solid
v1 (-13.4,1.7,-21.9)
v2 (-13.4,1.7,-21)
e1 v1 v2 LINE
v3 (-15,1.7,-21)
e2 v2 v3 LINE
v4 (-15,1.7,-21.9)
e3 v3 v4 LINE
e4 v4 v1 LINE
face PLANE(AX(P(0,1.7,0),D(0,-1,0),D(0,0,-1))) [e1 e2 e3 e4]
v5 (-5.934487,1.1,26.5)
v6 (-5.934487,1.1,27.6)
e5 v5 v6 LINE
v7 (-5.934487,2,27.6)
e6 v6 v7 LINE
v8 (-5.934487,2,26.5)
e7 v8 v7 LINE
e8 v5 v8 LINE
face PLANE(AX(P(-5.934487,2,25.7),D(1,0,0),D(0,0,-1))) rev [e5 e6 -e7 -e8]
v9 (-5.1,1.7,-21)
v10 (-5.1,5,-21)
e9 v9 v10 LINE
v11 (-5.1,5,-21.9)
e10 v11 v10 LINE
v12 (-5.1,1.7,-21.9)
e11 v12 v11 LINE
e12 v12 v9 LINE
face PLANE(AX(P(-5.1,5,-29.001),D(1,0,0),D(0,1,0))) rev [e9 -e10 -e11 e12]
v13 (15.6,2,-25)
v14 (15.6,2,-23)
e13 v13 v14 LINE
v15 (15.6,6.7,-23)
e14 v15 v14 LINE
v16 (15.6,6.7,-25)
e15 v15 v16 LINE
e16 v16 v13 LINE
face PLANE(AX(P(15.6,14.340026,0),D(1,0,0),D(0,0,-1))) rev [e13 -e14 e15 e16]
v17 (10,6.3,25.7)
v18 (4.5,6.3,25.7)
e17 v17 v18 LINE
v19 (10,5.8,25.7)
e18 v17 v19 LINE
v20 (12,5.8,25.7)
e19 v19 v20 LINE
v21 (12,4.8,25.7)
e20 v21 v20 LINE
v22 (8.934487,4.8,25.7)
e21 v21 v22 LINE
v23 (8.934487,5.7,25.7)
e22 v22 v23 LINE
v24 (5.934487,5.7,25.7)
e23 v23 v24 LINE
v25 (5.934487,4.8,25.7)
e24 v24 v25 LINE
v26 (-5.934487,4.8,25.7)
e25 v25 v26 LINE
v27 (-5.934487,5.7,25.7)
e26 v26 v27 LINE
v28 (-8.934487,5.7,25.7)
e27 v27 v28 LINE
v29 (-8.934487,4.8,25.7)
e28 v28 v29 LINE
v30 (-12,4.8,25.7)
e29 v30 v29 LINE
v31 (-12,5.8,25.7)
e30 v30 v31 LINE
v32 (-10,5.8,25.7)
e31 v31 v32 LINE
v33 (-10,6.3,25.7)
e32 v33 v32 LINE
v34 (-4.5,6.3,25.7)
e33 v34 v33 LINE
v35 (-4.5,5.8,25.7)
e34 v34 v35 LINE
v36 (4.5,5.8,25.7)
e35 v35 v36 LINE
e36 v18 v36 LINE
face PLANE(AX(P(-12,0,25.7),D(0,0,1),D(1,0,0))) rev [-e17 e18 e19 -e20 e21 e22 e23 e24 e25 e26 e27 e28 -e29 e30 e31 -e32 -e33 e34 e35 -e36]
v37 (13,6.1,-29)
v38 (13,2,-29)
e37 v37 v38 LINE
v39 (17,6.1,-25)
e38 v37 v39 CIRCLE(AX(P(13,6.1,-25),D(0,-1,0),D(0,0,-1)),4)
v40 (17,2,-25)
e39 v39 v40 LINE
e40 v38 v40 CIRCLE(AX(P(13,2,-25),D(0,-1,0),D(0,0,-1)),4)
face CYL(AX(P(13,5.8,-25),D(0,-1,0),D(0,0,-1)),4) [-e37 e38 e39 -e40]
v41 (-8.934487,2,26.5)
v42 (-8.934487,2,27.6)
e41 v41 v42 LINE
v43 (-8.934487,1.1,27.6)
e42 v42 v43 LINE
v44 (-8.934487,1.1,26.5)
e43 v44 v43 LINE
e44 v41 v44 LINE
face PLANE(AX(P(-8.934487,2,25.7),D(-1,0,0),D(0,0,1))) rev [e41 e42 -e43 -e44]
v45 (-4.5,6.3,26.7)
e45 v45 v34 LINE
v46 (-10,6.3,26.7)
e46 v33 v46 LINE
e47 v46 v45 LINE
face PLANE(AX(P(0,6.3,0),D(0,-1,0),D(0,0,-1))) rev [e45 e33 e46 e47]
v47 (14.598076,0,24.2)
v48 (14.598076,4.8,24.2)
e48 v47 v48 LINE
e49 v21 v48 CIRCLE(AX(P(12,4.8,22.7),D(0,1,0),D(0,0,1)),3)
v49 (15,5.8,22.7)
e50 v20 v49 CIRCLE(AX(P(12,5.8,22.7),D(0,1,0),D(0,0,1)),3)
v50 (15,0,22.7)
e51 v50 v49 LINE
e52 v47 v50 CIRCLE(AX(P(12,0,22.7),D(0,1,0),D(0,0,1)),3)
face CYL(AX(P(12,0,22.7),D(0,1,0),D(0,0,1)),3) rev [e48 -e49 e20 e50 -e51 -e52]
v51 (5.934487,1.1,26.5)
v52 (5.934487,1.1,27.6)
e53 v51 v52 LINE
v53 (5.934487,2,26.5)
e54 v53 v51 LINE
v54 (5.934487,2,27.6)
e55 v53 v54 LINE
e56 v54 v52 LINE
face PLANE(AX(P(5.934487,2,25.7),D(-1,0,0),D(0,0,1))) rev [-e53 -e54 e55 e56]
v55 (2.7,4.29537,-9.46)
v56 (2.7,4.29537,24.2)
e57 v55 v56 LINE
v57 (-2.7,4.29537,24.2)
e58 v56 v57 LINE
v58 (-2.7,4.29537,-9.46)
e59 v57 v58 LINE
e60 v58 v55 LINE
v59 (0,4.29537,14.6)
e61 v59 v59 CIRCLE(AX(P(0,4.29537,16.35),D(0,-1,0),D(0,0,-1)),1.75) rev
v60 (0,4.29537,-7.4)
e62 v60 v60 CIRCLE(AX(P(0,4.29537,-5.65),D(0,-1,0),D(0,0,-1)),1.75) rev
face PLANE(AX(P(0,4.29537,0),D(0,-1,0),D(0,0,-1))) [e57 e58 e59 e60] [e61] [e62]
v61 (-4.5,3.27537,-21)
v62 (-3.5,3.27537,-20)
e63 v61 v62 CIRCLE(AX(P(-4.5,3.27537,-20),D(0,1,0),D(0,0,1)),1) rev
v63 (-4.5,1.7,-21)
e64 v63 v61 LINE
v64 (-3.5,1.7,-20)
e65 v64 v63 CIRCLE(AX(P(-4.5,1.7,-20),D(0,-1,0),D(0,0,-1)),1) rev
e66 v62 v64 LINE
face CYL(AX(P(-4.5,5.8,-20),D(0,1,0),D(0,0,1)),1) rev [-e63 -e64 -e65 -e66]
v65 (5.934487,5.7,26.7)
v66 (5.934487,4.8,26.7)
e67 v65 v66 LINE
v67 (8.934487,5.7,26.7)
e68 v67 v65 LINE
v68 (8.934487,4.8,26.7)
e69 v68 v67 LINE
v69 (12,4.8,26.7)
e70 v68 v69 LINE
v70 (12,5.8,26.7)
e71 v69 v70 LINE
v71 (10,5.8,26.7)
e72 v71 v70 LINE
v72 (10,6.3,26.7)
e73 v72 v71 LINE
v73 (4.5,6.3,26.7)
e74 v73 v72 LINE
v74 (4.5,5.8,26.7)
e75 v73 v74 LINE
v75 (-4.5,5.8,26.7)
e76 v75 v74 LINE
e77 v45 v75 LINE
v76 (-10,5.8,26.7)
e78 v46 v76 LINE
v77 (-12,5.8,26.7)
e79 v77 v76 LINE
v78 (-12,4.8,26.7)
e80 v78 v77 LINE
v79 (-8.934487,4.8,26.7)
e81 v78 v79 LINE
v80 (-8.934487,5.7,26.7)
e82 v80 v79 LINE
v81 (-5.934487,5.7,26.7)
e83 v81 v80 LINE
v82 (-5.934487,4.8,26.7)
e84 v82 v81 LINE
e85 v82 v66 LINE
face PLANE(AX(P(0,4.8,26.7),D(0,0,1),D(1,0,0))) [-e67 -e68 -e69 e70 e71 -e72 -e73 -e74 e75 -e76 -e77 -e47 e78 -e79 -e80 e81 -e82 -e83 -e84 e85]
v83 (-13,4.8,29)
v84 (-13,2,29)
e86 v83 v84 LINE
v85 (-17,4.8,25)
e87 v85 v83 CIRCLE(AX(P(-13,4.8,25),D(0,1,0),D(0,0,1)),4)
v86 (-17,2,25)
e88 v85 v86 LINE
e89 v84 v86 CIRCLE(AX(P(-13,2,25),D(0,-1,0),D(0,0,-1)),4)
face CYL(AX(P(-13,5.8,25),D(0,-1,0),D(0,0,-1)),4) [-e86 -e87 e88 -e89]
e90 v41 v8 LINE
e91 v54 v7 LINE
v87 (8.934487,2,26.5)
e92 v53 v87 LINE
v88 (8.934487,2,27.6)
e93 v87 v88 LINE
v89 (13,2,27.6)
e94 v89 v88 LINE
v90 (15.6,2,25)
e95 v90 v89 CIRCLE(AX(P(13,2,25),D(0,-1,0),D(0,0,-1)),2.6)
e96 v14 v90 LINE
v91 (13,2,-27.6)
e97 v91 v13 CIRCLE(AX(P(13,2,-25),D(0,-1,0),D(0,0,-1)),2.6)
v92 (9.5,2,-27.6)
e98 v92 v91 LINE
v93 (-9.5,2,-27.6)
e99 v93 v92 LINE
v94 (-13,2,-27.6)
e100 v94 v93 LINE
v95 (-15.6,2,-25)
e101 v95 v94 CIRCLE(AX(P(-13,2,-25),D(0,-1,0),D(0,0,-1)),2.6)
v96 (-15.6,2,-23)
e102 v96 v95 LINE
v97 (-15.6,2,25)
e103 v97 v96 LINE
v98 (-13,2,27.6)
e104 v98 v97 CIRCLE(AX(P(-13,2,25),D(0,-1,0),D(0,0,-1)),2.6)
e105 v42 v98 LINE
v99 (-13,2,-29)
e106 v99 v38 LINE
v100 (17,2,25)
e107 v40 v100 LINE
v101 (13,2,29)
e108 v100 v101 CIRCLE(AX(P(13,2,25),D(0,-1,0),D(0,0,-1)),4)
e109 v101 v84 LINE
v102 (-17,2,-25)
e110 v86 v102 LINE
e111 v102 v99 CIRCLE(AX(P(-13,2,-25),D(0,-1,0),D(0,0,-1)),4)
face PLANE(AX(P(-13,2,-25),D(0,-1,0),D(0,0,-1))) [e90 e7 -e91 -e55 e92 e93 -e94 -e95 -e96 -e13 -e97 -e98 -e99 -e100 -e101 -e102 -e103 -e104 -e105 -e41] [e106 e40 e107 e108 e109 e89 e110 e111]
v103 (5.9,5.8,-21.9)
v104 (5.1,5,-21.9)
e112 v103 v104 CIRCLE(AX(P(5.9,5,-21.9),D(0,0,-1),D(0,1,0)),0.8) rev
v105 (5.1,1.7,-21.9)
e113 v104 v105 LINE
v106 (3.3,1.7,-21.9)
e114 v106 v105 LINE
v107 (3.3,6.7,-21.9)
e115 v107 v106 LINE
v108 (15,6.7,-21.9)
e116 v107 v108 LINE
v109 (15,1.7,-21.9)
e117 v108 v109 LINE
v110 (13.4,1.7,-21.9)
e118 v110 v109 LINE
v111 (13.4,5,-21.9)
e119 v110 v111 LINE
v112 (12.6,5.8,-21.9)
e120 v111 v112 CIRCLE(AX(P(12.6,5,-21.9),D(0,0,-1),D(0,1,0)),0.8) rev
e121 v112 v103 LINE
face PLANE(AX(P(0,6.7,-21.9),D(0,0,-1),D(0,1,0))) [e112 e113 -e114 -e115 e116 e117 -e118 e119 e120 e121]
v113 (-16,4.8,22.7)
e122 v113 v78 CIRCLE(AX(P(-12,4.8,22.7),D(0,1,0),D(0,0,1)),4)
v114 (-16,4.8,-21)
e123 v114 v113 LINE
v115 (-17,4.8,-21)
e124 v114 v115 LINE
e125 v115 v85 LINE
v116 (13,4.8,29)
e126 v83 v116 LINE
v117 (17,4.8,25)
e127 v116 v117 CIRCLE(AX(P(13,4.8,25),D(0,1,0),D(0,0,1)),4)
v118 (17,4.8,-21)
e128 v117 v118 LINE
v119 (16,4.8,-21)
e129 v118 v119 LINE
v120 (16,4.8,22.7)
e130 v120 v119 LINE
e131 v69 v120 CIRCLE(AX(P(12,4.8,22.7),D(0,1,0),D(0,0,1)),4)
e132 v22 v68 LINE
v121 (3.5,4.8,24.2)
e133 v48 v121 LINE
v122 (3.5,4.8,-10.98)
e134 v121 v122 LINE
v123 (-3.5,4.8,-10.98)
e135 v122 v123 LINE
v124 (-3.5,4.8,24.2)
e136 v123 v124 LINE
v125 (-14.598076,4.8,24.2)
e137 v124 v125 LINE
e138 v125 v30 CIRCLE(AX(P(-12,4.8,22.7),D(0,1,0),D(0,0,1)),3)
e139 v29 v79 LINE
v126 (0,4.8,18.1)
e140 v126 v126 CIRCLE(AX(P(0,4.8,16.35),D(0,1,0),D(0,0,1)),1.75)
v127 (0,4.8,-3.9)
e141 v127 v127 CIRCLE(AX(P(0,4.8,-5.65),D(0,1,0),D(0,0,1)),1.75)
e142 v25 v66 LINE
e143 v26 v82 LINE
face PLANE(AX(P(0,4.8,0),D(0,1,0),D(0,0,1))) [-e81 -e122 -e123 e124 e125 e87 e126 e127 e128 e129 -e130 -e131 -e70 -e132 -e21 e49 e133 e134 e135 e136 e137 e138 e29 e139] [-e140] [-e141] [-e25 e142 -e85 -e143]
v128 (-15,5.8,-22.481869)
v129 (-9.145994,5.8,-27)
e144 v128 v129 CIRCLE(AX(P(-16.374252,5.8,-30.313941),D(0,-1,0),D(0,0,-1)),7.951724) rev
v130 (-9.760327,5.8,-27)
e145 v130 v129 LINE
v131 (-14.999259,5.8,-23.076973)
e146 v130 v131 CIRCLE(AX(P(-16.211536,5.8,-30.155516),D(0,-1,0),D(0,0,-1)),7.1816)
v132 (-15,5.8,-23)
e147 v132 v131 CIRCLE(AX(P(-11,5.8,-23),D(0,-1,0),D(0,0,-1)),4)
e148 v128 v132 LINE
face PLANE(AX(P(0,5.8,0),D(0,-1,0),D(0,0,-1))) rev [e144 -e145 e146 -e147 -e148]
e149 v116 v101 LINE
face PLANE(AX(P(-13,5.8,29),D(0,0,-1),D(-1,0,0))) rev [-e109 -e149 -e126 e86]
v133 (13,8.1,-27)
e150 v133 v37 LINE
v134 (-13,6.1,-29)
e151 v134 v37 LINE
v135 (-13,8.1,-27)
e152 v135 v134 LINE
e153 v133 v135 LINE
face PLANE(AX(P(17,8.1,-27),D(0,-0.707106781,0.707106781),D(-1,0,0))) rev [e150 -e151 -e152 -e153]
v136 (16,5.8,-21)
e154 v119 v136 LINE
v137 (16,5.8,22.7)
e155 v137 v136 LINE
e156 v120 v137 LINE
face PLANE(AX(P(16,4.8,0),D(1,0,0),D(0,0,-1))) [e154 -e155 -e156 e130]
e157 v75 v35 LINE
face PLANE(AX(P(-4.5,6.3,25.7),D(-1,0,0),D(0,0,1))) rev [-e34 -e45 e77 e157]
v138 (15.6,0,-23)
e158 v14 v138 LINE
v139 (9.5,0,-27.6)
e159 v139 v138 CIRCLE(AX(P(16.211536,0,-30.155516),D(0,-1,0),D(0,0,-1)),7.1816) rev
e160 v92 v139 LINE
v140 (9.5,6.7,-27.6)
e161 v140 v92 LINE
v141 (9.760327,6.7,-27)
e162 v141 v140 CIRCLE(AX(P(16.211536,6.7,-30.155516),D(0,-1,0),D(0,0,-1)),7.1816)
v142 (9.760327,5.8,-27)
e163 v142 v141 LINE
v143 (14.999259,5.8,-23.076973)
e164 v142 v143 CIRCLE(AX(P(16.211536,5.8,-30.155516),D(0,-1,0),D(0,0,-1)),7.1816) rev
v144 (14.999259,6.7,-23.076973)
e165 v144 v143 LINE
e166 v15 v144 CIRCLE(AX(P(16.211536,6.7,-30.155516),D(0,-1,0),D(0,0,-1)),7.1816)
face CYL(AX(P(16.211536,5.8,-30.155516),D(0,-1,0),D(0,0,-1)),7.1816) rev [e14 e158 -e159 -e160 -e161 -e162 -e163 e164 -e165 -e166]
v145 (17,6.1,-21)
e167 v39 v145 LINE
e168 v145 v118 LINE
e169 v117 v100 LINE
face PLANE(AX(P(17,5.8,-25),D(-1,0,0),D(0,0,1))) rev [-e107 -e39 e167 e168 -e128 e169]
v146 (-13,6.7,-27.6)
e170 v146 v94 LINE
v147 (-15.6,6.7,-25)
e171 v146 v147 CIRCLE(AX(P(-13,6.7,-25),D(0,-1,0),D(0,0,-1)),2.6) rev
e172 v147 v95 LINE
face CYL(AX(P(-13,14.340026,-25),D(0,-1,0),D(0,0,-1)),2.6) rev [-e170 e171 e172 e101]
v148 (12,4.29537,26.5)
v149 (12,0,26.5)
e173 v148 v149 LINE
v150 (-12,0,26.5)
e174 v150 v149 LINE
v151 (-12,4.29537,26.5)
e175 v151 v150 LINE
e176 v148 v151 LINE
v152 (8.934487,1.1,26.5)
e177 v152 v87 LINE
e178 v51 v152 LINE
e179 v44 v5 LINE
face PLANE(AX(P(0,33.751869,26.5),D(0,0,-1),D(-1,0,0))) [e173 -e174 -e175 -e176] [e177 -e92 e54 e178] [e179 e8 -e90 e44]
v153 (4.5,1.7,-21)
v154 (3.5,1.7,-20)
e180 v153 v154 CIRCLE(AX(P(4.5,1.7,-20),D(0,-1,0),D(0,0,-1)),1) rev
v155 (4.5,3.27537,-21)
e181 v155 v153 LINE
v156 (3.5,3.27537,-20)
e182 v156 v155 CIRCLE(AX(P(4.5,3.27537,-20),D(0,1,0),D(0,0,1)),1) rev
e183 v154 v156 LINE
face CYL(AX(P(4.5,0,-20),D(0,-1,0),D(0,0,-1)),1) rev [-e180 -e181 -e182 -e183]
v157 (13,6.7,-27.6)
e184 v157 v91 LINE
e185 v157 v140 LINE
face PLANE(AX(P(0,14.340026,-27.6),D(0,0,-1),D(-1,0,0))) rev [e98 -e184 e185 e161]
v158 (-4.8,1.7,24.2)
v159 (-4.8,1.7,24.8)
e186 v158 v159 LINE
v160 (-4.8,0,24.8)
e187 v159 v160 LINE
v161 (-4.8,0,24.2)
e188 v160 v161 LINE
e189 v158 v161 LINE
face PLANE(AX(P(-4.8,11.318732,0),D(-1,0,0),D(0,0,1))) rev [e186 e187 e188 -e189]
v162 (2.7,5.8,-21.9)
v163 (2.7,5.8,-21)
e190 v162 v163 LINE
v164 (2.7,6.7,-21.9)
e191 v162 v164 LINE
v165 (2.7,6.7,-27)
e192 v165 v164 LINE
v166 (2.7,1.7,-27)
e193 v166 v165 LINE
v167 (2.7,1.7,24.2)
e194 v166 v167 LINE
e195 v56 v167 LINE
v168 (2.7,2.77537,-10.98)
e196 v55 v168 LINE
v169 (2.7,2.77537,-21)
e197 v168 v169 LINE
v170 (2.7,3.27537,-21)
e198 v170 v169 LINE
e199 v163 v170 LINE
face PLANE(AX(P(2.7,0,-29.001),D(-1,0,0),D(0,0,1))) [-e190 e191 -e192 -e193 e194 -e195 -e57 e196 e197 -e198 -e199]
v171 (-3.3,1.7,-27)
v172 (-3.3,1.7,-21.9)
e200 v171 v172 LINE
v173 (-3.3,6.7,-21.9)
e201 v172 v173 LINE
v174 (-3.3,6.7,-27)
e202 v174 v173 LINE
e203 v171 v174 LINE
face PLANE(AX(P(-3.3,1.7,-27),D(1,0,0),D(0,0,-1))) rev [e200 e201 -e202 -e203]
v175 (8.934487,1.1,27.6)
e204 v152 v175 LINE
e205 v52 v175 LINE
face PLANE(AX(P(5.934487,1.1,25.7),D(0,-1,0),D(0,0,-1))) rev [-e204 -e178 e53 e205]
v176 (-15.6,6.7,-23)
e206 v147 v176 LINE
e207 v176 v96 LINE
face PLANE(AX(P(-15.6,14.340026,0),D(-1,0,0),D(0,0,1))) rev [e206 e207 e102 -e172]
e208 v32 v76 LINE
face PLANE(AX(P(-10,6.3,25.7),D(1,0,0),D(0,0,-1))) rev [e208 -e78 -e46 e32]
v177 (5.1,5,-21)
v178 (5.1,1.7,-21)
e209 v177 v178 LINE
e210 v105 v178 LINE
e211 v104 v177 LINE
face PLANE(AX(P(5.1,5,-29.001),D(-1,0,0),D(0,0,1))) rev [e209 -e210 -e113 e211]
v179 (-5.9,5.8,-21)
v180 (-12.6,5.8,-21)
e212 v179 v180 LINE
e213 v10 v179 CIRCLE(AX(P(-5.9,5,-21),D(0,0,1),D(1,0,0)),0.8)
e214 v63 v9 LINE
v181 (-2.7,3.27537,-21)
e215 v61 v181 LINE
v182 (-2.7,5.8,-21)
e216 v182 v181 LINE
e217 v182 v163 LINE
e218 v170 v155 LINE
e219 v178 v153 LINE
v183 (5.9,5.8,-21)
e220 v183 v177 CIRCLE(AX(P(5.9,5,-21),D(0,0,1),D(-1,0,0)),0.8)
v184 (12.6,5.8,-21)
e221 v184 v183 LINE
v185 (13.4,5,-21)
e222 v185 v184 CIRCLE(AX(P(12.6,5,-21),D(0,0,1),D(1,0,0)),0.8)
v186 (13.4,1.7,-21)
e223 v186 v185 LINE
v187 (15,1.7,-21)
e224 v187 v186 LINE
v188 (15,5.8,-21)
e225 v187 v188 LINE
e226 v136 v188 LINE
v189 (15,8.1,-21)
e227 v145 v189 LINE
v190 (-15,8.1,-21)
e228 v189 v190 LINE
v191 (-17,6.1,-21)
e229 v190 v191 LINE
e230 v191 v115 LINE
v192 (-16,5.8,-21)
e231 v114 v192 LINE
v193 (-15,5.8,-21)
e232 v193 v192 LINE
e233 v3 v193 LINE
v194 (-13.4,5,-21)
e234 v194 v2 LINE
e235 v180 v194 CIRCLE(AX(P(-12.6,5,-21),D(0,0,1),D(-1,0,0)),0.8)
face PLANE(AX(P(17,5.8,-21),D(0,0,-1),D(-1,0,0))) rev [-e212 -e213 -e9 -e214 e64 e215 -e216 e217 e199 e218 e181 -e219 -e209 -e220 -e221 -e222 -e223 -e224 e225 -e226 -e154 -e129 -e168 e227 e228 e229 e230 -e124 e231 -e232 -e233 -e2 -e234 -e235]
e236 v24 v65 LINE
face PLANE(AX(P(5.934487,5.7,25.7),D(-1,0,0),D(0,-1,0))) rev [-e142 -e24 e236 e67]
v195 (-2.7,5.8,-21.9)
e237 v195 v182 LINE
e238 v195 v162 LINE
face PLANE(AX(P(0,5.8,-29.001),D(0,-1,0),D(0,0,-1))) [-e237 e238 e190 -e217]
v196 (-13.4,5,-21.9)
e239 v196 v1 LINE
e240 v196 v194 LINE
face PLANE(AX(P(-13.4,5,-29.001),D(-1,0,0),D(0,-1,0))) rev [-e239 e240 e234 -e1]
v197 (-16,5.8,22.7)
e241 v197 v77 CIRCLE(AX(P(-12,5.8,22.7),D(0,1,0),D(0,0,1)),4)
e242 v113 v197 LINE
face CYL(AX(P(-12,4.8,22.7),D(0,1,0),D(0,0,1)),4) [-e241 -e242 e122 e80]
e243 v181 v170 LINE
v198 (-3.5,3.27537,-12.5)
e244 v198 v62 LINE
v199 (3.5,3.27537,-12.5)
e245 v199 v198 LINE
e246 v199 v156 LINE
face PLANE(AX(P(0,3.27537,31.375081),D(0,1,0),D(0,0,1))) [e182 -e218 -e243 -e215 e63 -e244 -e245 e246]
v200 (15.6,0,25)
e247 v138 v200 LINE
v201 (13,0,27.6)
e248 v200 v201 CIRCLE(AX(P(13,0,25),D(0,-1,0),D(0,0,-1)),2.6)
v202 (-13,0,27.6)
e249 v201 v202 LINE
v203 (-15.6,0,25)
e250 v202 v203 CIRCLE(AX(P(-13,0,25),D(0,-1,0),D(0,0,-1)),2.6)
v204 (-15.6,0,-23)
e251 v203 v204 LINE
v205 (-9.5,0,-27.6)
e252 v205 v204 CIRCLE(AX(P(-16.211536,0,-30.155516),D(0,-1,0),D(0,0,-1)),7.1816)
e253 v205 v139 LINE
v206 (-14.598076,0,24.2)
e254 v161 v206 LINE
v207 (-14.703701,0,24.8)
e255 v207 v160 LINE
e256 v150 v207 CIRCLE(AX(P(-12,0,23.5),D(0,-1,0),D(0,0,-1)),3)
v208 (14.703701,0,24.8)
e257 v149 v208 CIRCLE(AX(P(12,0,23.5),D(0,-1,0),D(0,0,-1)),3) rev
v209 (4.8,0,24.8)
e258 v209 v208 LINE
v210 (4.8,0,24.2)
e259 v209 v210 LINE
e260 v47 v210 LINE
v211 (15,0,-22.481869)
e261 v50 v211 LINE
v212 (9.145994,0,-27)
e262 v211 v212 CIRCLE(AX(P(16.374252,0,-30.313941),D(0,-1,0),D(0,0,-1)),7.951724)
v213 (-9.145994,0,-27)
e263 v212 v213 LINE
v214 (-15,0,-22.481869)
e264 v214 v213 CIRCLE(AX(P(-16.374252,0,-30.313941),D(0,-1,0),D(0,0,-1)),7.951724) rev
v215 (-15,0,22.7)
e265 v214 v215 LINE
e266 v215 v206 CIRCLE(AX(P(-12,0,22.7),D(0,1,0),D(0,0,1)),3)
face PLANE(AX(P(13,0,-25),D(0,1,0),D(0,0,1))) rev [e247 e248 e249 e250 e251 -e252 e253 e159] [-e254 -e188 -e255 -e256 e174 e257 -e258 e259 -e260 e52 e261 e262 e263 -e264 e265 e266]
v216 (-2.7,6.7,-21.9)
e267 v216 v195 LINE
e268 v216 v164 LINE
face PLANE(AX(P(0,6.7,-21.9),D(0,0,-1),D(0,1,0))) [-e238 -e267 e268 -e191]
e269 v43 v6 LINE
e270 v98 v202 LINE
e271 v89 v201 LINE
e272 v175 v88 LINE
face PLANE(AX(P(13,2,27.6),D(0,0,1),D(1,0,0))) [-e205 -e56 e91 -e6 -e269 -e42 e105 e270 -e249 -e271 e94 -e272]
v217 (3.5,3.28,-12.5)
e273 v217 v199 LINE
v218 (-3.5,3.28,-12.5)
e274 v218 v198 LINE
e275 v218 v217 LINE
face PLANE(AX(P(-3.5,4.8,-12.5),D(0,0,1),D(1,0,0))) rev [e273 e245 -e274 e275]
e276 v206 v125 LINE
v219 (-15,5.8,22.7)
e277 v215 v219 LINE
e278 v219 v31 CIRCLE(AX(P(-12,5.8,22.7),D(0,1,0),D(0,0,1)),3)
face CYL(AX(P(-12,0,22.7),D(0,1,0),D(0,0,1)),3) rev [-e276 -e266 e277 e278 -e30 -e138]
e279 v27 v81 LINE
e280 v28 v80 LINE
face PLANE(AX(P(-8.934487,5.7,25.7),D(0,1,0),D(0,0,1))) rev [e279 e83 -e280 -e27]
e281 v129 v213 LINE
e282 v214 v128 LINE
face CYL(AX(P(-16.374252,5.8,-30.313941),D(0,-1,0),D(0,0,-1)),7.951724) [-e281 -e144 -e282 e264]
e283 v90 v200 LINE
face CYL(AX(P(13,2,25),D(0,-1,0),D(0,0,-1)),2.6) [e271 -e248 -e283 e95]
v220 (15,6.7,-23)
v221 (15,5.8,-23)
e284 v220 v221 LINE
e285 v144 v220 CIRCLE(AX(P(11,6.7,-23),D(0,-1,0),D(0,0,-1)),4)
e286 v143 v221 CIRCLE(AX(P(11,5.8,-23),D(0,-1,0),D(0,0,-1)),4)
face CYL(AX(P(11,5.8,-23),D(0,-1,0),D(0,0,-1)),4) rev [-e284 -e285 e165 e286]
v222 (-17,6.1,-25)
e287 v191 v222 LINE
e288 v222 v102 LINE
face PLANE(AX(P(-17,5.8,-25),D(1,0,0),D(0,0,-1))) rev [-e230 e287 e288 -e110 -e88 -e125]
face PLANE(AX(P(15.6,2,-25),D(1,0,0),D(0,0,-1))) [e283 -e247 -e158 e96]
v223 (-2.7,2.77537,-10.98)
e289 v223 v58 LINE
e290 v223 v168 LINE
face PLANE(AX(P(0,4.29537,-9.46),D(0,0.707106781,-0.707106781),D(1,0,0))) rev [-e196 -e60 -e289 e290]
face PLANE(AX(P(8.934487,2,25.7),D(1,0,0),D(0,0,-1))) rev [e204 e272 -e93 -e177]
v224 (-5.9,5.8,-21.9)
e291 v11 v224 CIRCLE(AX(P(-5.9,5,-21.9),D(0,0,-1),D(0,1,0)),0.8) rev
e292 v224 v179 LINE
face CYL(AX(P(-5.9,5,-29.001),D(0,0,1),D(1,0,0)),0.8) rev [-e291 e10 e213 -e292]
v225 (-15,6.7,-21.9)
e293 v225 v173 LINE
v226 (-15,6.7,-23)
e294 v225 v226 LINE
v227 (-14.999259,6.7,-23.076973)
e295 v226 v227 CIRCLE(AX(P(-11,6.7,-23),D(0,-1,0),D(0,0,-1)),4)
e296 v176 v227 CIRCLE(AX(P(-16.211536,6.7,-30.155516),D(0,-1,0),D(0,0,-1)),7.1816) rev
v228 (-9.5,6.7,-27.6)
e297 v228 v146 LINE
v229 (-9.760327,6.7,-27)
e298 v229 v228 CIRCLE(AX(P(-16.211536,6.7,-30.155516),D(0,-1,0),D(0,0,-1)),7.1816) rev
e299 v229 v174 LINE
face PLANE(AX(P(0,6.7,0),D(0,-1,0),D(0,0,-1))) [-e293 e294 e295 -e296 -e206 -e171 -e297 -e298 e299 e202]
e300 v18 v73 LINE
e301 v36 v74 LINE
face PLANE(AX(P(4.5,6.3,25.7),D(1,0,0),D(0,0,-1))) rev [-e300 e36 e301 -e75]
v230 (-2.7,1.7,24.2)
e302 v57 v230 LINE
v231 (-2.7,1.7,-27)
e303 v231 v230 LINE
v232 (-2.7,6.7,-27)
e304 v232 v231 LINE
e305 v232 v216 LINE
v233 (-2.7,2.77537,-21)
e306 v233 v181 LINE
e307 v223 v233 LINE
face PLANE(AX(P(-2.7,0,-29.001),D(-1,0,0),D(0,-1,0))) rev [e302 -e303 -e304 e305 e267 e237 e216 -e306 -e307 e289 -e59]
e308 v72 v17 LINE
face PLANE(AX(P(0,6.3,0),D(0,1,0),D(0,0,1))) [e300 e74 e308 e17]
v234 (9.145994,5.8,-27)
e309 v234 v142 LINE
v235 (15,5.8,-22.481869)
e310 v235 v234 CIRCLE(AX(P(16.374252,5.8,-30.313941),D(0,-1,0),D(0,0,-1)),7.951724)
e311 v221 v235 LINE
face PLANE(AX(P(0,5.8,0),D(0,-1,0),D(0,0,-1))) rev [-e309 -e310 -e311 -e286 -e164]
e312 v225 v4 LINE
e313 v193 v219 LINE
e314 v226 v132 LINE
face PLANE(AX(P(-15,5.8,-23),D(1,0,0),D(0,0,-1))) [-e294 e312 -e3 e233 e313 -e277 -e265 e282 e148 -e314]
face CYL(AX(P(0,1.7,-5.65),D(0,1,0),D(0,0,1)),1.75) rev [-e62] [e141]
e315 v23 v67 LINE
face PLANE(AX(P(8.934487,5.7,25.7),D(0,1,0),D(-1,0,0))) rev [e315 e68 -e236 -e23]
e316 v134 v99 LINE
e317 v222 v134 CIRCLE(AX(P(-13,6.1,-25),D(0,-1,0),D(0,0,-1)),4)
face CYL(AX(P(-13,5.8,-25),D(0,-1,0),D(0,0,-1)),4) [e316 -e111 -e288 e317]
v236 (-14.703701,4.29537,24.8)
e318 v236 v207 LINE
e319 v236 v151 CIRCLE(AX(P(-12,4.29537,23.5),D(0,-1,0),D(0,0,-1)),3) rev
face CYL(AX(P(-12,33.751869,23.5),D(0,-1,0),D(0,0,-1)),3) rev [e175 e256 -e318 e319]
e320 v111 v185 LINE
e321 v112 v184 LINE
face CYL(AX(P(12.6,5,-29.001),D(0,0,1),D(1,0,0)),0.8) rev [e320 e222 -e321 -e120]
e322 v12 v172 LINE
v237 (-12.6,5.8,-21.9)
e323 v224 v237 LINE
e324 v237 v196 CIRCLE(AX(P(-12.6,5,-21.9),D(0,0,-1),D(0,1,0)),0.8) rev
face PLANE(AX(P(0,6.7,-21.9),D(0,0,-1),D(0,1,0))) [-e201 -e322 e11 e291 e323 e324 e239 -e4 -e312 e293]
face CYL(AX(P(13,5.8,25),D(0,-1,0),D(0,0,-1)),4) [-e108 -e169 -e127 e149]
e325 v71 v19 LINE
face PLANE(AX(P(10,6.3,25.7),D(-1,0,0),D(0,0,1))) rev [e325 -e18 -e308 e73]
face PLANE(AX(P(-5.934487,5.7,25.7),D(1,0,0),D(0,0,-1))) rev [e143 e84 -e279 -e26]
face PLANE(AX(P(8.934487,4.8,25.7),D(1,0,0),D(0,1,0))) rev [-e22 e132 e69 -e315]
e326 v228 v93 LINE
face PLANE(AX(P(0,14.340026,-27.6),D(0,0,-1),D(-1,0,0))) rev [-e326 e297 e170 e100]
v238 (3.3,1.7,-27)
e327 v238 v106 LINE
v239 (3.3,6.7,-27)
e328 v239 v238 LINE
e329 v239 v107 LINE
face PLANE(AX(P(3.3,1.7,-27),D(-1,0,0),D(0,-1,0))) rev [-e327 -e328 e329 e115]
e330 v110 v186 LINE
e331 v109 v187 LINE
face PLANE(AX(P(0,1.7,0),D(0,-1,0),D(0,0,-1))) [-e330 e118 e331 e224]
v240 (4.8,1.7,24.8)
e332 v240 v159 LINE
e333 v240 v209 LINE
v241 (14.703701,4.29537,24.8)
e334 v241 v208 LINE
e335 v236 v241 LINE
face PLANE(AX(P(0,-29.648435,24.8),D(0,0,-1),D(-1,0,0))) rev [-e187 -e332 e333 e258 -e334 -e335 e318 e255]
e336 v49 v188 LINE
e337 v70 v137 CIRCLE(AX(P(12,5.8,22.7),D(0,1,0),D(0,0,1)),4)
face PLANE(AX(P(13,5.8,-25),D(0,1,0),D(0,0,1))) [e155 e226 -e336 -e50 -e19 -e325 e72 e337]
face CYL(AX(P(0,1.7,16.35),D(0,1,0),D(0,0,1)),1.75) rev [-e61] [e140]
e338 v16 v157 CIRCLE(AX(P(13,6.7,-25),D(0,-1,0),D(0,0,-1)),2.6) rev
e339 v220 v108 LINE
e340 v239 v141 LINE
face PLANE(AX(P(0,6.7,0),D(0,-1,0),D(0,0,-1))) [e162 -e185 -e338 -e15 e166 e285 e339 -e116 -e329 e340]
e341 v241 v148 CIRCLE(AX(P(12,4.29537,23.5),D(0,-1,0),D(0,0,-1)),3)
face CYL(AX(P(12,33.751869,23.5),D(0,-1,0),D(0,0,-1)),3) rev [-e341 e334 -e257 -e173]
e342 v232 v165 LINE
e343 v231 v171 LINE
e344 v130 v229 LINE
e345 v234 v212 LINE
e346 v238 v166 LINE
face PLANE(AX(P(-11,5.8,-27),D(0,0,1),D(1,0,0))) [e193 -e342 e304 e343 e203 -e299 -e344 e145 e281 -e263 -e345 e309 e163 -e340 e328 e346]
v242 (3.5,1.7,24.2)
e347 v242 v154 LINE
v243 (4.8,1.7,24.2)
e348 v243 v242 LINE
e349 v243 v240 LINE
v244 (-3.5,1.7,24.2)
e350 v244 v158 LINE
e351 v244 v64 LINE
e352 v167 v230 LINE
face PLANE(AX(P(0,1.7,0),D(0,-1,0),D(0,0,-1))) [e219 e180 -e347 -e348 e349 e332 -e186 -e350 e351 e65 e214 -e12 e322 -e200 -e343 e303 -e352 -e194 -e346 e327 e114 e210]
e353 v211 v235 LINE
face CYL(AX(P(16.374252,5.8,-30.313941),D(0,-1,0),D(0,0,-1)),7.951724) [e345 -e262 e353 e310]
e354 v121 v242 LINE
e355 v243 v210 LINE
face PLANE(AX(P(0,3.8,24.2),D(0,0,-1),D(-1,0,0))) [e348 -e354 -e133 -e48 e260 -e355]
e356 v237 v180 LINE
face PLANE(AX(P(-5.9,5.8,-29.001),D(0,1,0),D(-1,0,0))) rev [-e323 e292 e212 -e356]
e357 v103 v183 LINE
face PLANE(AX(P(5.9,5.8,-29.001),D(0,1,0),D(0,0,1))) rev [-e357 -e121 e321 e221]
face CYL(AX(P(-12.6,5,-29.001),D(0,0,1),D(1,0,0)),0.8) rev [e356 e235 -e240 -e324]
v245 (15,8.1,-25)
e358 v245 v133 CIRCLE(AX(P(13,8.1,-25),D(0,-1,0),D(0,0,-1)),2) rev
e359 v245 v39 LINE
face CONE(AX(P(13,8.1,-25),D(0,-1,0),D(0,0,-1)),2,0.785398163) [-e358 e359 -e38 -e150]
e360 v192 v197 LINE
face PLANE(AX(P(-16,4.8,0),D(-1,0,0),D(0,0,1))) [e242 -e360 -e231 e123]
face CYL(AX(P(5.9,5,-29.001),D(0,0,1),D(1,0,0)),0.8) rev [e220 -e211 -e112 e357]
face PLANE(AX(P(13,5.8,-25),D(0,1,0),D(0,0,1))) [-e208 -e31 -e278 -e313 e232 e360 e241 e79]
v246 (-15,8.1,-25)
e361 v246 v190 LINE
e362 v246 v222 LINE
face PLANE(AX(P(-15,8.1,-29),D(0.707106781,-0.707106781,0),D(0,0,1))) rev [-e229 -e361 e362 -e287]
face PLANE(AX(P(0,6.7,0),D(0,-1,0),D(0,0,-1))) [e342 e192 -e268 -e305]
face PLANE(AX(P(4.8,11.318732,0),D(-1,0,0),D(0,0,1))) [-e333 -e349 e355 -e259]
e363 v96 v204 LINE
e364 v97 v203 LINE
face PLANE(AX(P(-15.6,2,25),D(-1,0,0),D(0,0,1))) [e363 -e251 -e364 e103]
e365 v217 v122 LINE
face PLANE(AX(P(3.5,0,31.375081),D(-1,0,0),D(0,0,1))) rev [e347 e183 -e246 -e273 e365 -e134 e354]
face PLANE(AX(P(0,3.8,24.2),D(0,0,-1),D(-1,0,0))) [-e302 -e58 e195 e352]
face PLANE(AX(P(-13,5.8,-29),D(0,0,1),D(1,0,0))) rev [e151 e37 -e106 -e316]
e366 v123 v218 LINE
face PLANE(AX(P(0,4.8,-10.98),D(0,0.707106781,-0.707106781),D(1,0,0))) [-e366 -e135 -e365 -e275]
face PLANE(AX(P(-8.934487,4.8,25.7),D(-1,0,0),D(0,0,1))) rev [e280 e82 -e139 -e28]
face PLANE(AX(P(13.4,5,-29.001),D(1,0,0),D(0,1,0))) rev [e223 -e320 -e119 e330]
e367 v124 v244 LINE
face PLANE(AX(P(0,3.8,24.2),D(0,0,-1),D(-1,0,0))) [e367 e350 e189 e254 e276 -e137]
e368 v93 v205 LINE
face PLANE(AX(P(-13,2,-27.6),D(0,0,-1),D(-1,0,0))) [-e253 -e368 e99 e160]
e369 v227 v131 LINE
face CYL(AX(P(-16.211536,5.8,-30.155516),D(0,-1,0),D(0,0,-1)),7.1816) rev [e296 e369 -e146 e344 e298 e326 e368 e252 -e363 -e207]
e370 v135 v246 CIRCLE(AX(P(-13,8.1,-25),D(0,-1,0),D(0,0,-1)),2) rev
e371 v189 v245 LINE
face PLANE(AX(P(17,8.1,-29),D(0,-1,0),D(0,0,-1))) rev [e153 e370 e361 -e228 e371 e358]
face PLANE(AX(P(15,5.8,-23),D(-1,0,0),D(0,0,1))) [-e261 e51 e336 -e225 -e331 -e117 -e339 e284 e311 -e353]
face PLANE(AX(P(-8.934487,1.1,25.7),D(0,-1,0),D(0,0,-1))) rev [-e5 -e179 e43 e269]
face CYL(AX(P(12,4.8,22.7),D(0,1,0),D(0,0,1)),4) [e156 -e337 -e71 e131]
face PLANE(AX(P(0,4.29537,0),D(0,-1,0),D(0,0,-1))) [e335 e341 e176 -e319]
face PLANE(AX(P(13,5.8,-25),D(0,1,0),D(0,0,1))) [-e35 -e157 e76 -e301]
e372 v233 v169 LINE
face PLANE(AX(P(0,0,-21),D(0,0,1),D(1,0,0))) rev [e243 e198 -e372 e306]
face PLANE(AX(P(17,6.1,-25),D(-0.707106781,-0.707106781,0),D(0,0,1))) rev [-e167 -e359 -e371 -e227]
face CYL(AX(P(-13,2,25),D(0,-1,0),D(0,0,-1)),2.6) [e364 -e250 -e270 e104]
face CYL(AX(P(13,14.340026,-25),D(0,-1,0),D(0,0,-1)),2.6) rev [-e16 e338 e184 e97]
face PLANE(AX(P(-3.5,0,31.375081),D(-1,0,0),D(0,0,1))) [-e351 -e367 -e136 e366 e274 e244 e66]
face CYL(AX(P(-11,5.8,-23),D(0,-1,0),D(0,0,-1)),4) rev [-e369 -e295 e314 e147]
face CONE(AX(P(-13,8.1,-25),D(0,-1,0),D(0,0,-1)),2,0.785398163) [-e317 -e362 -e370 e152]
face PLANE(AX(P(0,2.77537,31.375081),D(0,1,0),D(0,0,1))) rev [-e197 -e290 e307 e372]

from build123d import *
from build123d.topology import SkipClean

# Parameters (mm, degrees)
BOSS_EXTRUDE2_DEPTH      = 5.8
BOSS_EXTRUDE5_DEPTH      = 17
BOSS_EXTRUDE5_DEPTH_BACK = 17
SKETCH20_W               = 8
SKETCH20_H               = 2.3
CUT_EXTRUDE3_DEPTH       = 35.112167917
BOSS_EXTRUDE6_DEPTH      = 5.8
CHAMFER1_SIZE            = 2
CUT_EXTRUDE4_START       = -1
CUT_EXTRUDE4_DEPTH       = 1
CUT_EXTRUDE5_DEPTH       = 35.112167917
BOSS_EXTRUDE8_DEPTH      = 5.8
SKETCH28_W               = 5.5
SKETCH28_H               = 1
BOSS_EXTRUDE9_DEPTH      = 0.5
CUT_EXTRUDE6_DEPTH       = 1
CUT_EXTRUDE7_DEPTH       = 2
CUT_EXTRUDE14_START      = -1.9
SKETCH45_W               = 3
SKETCH45_H               = 0.9
CUT_EXTRUDE14_DEPTH      = 1.9
CUT_EXTRUDE11_DEPTH      = 0.9
SKETCH40_W               = 30
SKETCH40_H               = 0.9
BOSS_EXTRUDE11_DEPTH     = 4.1
CUT_EXTRUDE12_REACH      = 55.429
CUT_EXTRUDE13_REACH      = 55.429
SKETCH47_W               = 0.6
SKETCH47_H               = 5
BOSS_EXTRUDE13_DEPTH     = 5.1
BOSS_EXTRUDE14_DEPTH     = 5.8
CUT_EXTRUDE23_DEPTH      = 6.7
BOSS_EXTRUDE15_DEPTH     = 1
SKETCH43_W               = 5.4
SKETCH43_H               = 0.5
SKETCH43_W_2             = 0.8
SKETCH43_H_2             = 1.075370029
BOSS_EXTRUDE17_DEPTH     = 45.2
SKETCH53_W               = 7
SKETCH53_H               = 36.7
BOSS_EXTRUDE18_DEPTH     = 1.52463
CHAMFER3_SIZE            = 1.52
CUT_EXTRUDE24_START      = -2.02463
SKETCH56_R               = 1.75
CUT_EXTRUDE24_DEPTH      = 2.02463
FILLET1_R                = 1
SKETCH57_W               = 5.4
SKETCH57_H               = 35.18
CUT_EXTRUDE25_DEPTH      = 1.52
CHAMFER4_SIZE            = 1.52
SKETCH59_W               = 0.8
SKETCH59_H               = 2.1
BOSS_EXTRUDE21_DEPTH     = 1.5
SKETCH61_W               = 4.290499921
SKETCH61_H               = 0.6
BOSS_EXTRUDE23_DEPTH     = 3.8
SKETCH64_W               = 4.8
SKETCH64_H               = 0.6
CUT_EXTRUDE26_DEPTH      = 1.7
CUT_EXTRUDE27_START      = -4.295370029
CUT_EXTRUDE27_DEPTH      = 4.295370029


with BuildPart() as part:
    # Sketch1 → Boss-Extrude2 (new body)
    with BuildSketch(Plane(origin=(0, 0, 0), x_dir=(1, 0, 0), z_dir=(0, 1, 0))):
        with BuildLine():
            Line((-13, 29), (13, 29))
            ThreePointArc((13, 29), (15.828427125, 27.828427125), (17, 25))
            Line((17, 25), (17, -25))
            ThreePointArc((17, -25), (15.828427125, -27.828427125), (13, -29))
            Line((13, -29), (-13, -29))
            ThreePointArc((-13, -29), (-15.828427125, -27.828427125), (-17, -25))
            Line((-17, -25), (-17, 25))
            ThreePointArc((-17, 25), (-15.828427125, 27.828427125), (-13, 29))
        make_face()
        with BuildLine():
            Line((-11, 27), (11, 27))
            ThreePointArc((11, 27), (13.828427125, 25.828427125), (15, 23))
            Line((15, 23), (15, -23))
            ThreePointArc((15, -23), (13.828427125, -25.828427125), (11, -27))
            Line((11, -27), (-11, -27))
            ThreePointArc((-11, -27), (-13.828427125, -25.828427125), (-15, -23))
            Line((-15, -23), (-15, 23))
            ThreePointArc((-15, 23), (-13.828427125, 25.828427125), (-11, 27))
        make_face(mode=Mode.SUBTRACT)
    extrude(amount=BOSS_EXTRUDE2_DEPTH)

    # Sketch20 → Boss-Extrude5 (add, two sides: drawn at the far end of the back side and taken through both)
    with BuildSketch(Plane(origin=(0, 0, 0), x_dir=(0, 0, -1), z_dir=(1, 0, 0)).offset(-BOSS_EXTRUDE5_DEPTH_BACK)):
        with Locations((25, 6.95)):
            Rectangle(SKETCH20_W, SKETCH20_H)
    extrude(amount=BOSS_EXTRUDE5_DEPTH + BOSS_EXTRUDE5_DEPTH_BACK)

    # Sketch22 → Cut-Extrude3 (cut, through all)
    with BuildSketch(Plane.XZ.offset(-5.8)):
        with BuildLine():
            Line((-17, -25), (-17, -29))
            Line((-17, -29), (-13, -29))
            ThreePointArc((-13, -29), (-15.828427125, -27.828427125), (-17, -25))
        make_face()
        with BuildLine():
            Line((13, -29), (17, -29))
            Line((17, -29), (17, -25))
            ThreePointArc((17, -25), (15.828427125, -27.828427125), (13, -29))
        make_face()
    extrude(amount=-CUT_EXTRUDE3_DEPTH, mode=Mode.SUBTRACT)

    # Sketch23 → Boss-Extrude6 (add, through all)
    with BuildSketch(Plane(origin=(0, 5.8, 0), x_dir=(1, 0, 0), z_dir=(0, 1, 0))):
        with BuildLine():
            Line((-17, -24.2), (17, -24.2))
            Line((17, -24.2), (17, -25))
            ThreePointArc((17, -25), (15.828427125, -27.828427125), (13, -29))
            Line((13, -29), (-13, -29))
            ThreePointArc((-13, -29), (-15.828427125, -27.828427125), (-17, -25))
            Line((-17, -25), (-17, -24.2))
        make_face()
    extrude(amount=-BOSS_EXTRUDE6_DEPTH)

    # Chamfer1
    chamfer1_edges = [part.edges().sort_by_distance(p)[0] for p in [
        (0, 8.1, -29),
        (-17, 8.1, -23),
        (17, 8.1, -23),
        (-15.828427125, 8.1, -27.828427125),
        (15.828427125, 8.1, -27.828427125),
    ]]
    chamfer(chamfer1_edges, length=CHAMFER1_SIZE)

    # Sketch26 → Cut-Extrude4 (cut)
    with BuildSketch(Plane(origin=(0, 5.8, 0), x_dir=(1, 0, 0), z_dir=(0, 1, 0)).offset(CUT_EXTRUDE4_START)):
        with BuildLine():
            Line((-16, 21), (-17, 21))
            Line((-17, 21), (-17, -25))
            ThreePointArc((-17, -25), (-15.828427125, -27.828427125), (-13, -29))
            Line((-13, -29), (13, -29))
            ThreePointArc((13, -29), (15.828427125, -27.828427125), (17, -25))
            Line((17, -25), (17, 21))
            Line((17, 21), (16, 21))
            Line((16, 21), (16, -22.7))
            ThreePointArc((16, -22.7), (14.828427125, -25.528427125), (12, -26.7))
            Line((12, -26.7), (-12, -26.7))
            ThreePointArc((-12, -26.7), (-14.828427125, -25.528427125), (-16, -22.7))
            Line((-16, -22.7), (-16, 21))
        make_face()
    extrude(amount=CUT_EXTRUDE4_DEPTH, mode=Mode.SUBTRACT)

    # Sketch27 → Cut-Extrude5 (cut, through all)
    with BuildSketch(Plane(origin=(0, 5.8, 0), x_dir=(1, 0, 0), z_dir=(0, 1, 0))):
        with BuildLine():
            Line((-15, -22.7), (15, -22.7))
            ThreePointArc((15, -22.7), (14.121320344, -24.821320344), (12, -25.7))
            Line((12, -25.7), (-12, -25.7))
            ThreePointArc((-12, -25.7), (-14.121320344, -24.821320344), (-15, -22.7))
        make_face()
    extrude(amount=-CUT_EXTRUDE5_DEPTH, mode=Mode.SUBTRACT)

    # Sketch25 → Boss-Extrude8 (add, through all)
    with BuildSketch(Plane(origin=(0, 5.8, 0), x_dir=(1, 0, 0), z_dir=(0, 1, 0))):
        with BuildLine():
            Line((15, 21), (15, -22.7))
            ThreePointArc((15, -22.7), (14.121320344, -24.821320344), (12, -25.7))
            Line((12, -25.7), (-12, -25.7))
            ThreePointArc((-12, -25.7), (-14.121320344, -24.821320344), (-15, -22.7))
            Line((-15, -22.7), (-15, 21))
            Line((-15, 21), (-16, 21))
            Line((-16, 21), (-16, -22.7))
            ThreePointArc((-16, -22.7), (-14.828427125, -25.528427125), (-12, -26.7))
            Line((-12, -26.7), (12, -26.7))
            ThreePointArc((12, -26.7), (14.828427125, -25.528427125), (16, -22.7))
            Line((16, -22.7), (16, 21))
            Line((16, 21), (15, 21))
        make_face()
    extrude(amount=-BOSS_EXTRUDE8_DEPTH)

    # Sketch28 → Boss-Extrude9 (add)
    with BuildSketch(Plane(origin=(0, 5.8, 0), x_dir=(1, 0, 0), z_dir=(0, 1, 0))):
        with Locations((-7.25, -26.2)):
            Rectangle(SKETCH28_W, SKETCH28_H)
        with Locations((7.25, -26.2)):
            Rectangle(SKETCH28_W, SKETCH28_H)
    extrude(amount=BOSS_EXTRUDE9_DEPTH)

    # Sketch29 → Cut-Extrude6 (cut)
    with BuildSketch(Plane.XY.offset(26.7)):
        Polygon((-7.434487223, 4.8), (-5.934487223, 4.8), (-5.934487223, 5.7), (-8.934487223, 5.7), (-8.934487223, 4.8), align=None)
        Polygon((8.934487223, 5.7), (5.934487223, 5.7), (5.934487223, 4.8), (7.434487223, 4.8), (8.934487223, 4.8), align=None)
    extrude(amount=-CUT_EXTRUDE6_DEPTH, mode=Mode.SUBTRACT)

    # Sketch33 → Cut-Extrude7 (cut)
    with BuildSketch(Plane.XZ):
        with BuildLine():
            Line((-13, -29), (13, -29))
            ThreePointArc((13, -29), (15.828427125, -27.828427125), (17, -25))
            Line((17, -25), (17, 25))
            ThreePointArc((17, 25), (15.828427125, 27.828427125), (13, 29))
            Line((13, 29), (-13, 29))
            ThreePointArc((-13, 29), (-15.828427125, 27.828427125), (-17, 25))
            Line((-17, 25), (-17, -25))
            ThreePointArc((-17, -25), (-15.828427125, -27.828427125), (-13, -29))
        make_face()
        with BuildLine():
            Line((-15.6, 25), (-15.6, -25))
            ThreePointArc((-15.6, -25), (-14.838477631, -26.838477631), (-13, -27.6))
            Line((-13, -27.6), (13, -27.6))
            ThreePointArc((13, -27.6), (14.838477631, -26.838477631), (15.6, -25))
            Line((15.6, -25), (15.6, 25))
            ThreePointArc((15.6, 25), (14.838477631, 26.838477631), (13, 27.6))
            Line((13, 27.6), (-13, 27.6))
            ThreePointArc((-13, 27.6), (-14.838477631, 26.838477631), (-15.6, 25))
        make_face(mode=Mode.SUBTRACT)
    extrude(amount=-CUT_EXTRUDE7_DEPTH, mode=Mode.SUBTRACT)

    # Sketch45 → Cut-Extrude14 (cut)
    with BuildSketch(Plane.XY.offset(27.6).offset(CUT_EXTRUDE14_START)):
        with Locations((7.434487223, 1.55)):
            Rectangle(SKETCH45_W, SKETCH45_H)
        with Locations((-7.434487223, 1.55)):
            Rectangle(SKETCH45_W, SKETCH45_H)
    extrude(amount=CUT_EXTRUDE14_DEPTH, mode=Mode.SUBTRACT)

    # Sketch39 → Cut-Extrude11 (cut)
    with BuildSketch(Plane.XZ.offset(-5.8)):
        with BuildLine():
            Line((15, -21.9), (-15, -21.9))
            Line((-15, -21.9), (-15, -23))
            ThreePointArc((-15, -23), (-13.828427125, -25.828427125), (-11, -27))
            Line((-11, -27), (11, -27))
            ThreePointArc((11, -27), (13.828427125, -25.828427125), (15, -23))
            Line((15, -23), (15, -21.9))
        make_face()
    extrude(amount=-CUT_EXTRUDE11_DEPTH, mode=Mode.SUBTRACT)

    # Sketch40 → Boss-Extrude11 (add)
    with BuildSketch(Plane.XZ.offset(-5.8)):
        with Locations((0, -21.45)):
            Rectangle(SKETCH40_W, SKETCH40_H)
    extrude(amount=BOSS_EXTRUDE11_DEPTH)

    # Sketch38 → Cut-Extrude12 (cut, up to next)
    with BuildSketch(Plane.XY.offset(-21), mode=Mode.PRIVATE) as cut_extrude12_sk1:
        Polygon((2.7, 5.8), (0, 5.8), (-2.7, 5.8), (-2.7, 1.285789379), (2.7, 1.285789379), align=None)
    cut_extrude12_tool1 = extrude(cut_extrude12_sk1.sketch, amount=-CUT_EXTRUDE12_REACH, mode=Mode.PRIVATE) & part.part
    add(cut_extrude12_tool1.solids().sort_by_distance((0, 3.542895, -21))[0], mode=Mode.SUBTRACT)

    # Sketch41 → Cut-Extrude13 (cut, up to next)
    with BuildSketch(Plane.XY.offset(-21), mode=Mode.PRIVATE) as cut_extrude13_sk1:
        with BuildLine():
            Line((5.9, 5.8), (12.6, 5.8))
            ThreePointArc((12.6, 5.8), (13.165685425, 5.565685425), (13.4, 5))
            Line((13.4, 5), (13.4, 1.7))
            Line((13.4, 1.7), (5.1, 1.7))
            Line((5.1, 1.7), (5.1, 5))
            ThreePointArc((5.1, 5), (5.334314575, 5.565685425), (5.9, 5.8))
        make_face()
    cut_extrude13_tool1 = extrude(cut_extrude13_sk1.sketch, amount=-CUT_EXTRUDE13_REACH, mode=Mode.PRIVATE) & part.part
    # Sketch41 → Cut-Extrude13 (cut, up to next)
    with BuildSketch(Plane.XY.offset(-21), mode=Mode.PRIVATE) as cut_extrude13_sk2:
        with BuildLine():
            Line((-5.1, 5), (-5.1, 1.7))
            Line((-5.1, 1.7), (-13.4, 1.7))
            Line((-13.4, 1.7), (-13.4, 5))
            ThreePointArc((-13.4, 5), (-13.165685425, 5.565685425), (-12.6, 5.8))
            Line((-12.6, 5.8), (-5.9, 5.8))
            ThreePointArc((-5.9, 5.8), (-5.334314575, 5.565685425), (-5.1, 5))
        make_face()
    cut_extrude13_tool2 = extrude(cut_extrude13_sk2.sketch, amount=-CUT_EXTRUDE13_REACH, mode=Mode.PRIVATE) & part.part
    add(cut_extrude13_tool1.solids().sort_by_distance((9.25, 3.734772, -21))[0], mode=Mode.SUBTRACT)
    add(cut_extrude13_tool2.solids().sort_by_distance((-9.25, 3.734772, -21))[0], mode=Mode.SUBTRACT)

    # Sketch47 → Boss-Extrude13 (add)
    with BuildSketch(Plane(origin=(0, 0, -21.9), x_dir=(-1, 0, 0), z_dir=(0, 0, -1))):
        with Locations((3, 4.2)):
            Rectangle(SKETCH47_W, SKETCH47_H)
        with Locations((-3, 4.2)):
            Rectangle(SKETCH47_W, SKETCH47_H)
    extrude(amount=BOSS_EXTRUDE13_DEPTH)

    # Sketch50 → Boss-Extrude14 (add)
    with BuildSketch(Plane.XZ):
        with BuildLine():
            ThreePointArc((15.6, -22.4), (11.498859301, -24.0321841), (8.9, -27.6))
            Line((8.9, -27.6), (9.5, -27.6))
            ThreePointArc((9.5, -27.6), (11.887551109, -24.421535167), (15.6, -23))
            Line((15.6, -23), (15.6, -22.4))
        make_face()
        with BuildLine():
            Line((-15.6, -22.4), (-15.6, -23))
            ThreePointArc((-15.6, -23), (-11.887551109, -24.421535167), (-9.5, -27.6))
            Line((-9.5, -27.6), (-8.9, -27.6))
            ThreePointArc((-8.9, -27.6), (-11.498859301, -24.0321841), (-15.6, -22.4))
        make_face()
    extrude(amount=-BOSS_EXTRUDE14_DEPTH)

    # Sketch50<6> → Cut-Extrude23 (cut)
    with SkipClean():  # the faces are left unmerged after this step: merging them gives an invalid solid
        with BuildSketch(Plane.XZ):
            with BuildLine():
                ThreePointArc((-14.999259325, -23.076973055), (-15.298817872, -23.032150864), (-15.6, -23))
                Line((-15.6, -23), (-15.6, -25))
                ThreePointArc((-15.6, -25), (-14.838477631, -26.838477631), (-13, -27.6))
                Line((-13, -27.6), (-9.5, -27.6))
                ThreePointArc((-9.5, -27.6), (-9.623329595, -27.297034905), (-9.760327053, -27))
                Line((-9.760327053, -27), (-11, -27))
                ThreePointArc((-11, -27), (-13.801080843, -25.855511532), (-14.999259325, -23.076973055))
            make_face()
            with BuildLine():
                Line((9.5, -27.6), (13, -27.6))
                ThreePointArc((13, -27.6), (14.838477631, -26.838477631), (15.6, -25))
                Line((15.6, -25), (15.6, -23))
                ThreePointArc((15.6, -23), (15.298817872, -23.032150864), (14.999259325, -23.076973055))
                ThreePointArc((14.999259325, -23.076973055), (13.801080843, -25.855511532), (11, -27))
                Line((11, -27), (9.760327053, -27))
                ThreePointArc((9.760327053, -27), (9.623329595, -27.297034905), (9.5, -27.6))
            make_face()
        extrude(amount=-CUT_EXTRUDE23_DEPTH, mode=Mode.SUBTRACT)

    # Sketch51 → Boss-Extrude15 (add)
    with SkipClean():  # the faces are left unmerged after this step: merging them gives an invalid solid
        with BuildSketch(Plane(origin=(0, 4.8, 0), x_dir=(1, 0, 0), z_dir=(0, 1, 0))):
            with BuildLine():
                Line((0, -24.2), (-14.598076211, -24.2))
                ThreePointArc((-14.598076211, -24.2), (-13.5, -25.298076211), (-12, -25.7))
                Line((-12, -25.7), (-10, -25.7))
                Line((-10, -25.7), (-4.5, -25.7))
                Line((-4.5, -25.7), (4.5, -25.7))
                Line((4.5, -25.7), (10, -25.7))
                Line((10, -25.7), (12, -25.7))
                ThreePointArc((12, -25.7), (13.5, -25.298076211), (14.598076211, -24.2))
                Line((14.598076211, -24.2), (0, -24.2))
            make_face()
        extrude(amount=-BOSS_EXTRUDE15_DEPTH)

    # Sketch43 → Boss-Extrude17 (add)
    with SkipClean():  # the faces are left unmerged after this step: merging them gives an invalid solid
        with BuildSketch(Plane.XY.offset(-21)):
            with Locations((0, 3.025370029)):
                Rectangle(SKETCH43_W, SKETCH43_H)
            with Locations((-3.1, 3.025370029)):
                Rectangle(SKETCH43_W_2, SKETCH43_H)
            with Locations((-3.1, 2.237685015)):
                Rectangle(SKETCH43_W_2, SKETCH43_H_2)
            with Locations((3.1, 2.237685015)):
                Rectangle(SKETCH43_W_2, SKETCH43_H_2)
            with Locations((3.1, 3.025370029)):
                Rectangle(SKETCH43_W_2, SKETCH43_H)
        extrude(amount=BOSS_EXTRUDE17_DEPTH)

    # Sketch53 → Boss-Extrude18 (add)
    with SkipClean():  # the faces are left unmerged after this step: merging them gives an invalid solid
        with BuildSketch(Plane(origin=(0, 3.275370029, 0), x_dir=(1, 0, 0), z_dir=(0, 1, 0))):
            with Locations((0, -5.85)):
                Rectangle(SKETCH53_W, SKETCH53_H)
        extrude(amount=BOSS_EXTRUDE18_DEPTH)

    # Chamfer3
    chamfer3_edges = [part.edges().sort_by_distance(p)[0] for p in [
        (0, 4.800000029, -12.5),
    ]]
    chamfer(chamfer3_edges, length=CHAMFER3_SIZE)

    # Sketch56 → Cut-Extrude24 (cut)
    with SkipClean():  # the faces are left unmerged after this step: merging them gives an invalid solid
        with BuildSketch(Plane(origin=(0, 4.8, 0), x_dir=(1, 0, 0), z_dir=(0, 1, 0)).offset(CUT_EXTRUDE24_START)):
            with Locations(Location((0, -16.35, 0), (0, 0, 270))):
                Circle(SKETCH56_R)
            with Locations(Location((0, 5.65, 0), (0, 0, 270))):
                Circle(SKETCH56_R)
        extrude(amount=CUT_EXTRUDE24_DEPTH, mode=Mode.SUBTRACT)

    # Fillet1
    fillet1_edges = [part.edges().sort_by_distance(p)[0] for p in [
        (-3.5, 2.487685015, -21),
        (3.5, 2.487685015, -21),
    ]]
    fillet(fillet1_edges, radius=FILLET1_R)

    # Sketch57 → Cut-Extrude25 (cut)
    with SkipClean():  # the faces are left unmerged after this step: merging them gives an invalid solid
        with BuildSketch(Plane.XZ.offset(-2.775370029)):
            with Locations((0, 6.61)):
                Rectangle(SKETCH57_W, SKETCH57_H)
        extrude(amount=-CUT_EXTRUDE25_DEPTH, mode=Mode.SUBTRACT)

    # Chamfer4
    chamfer4_edges = [part.edges().sort_by_distance(p)[0] for p in [
        (0, 4.295370029, -10.98),
    ]]
    chamfer(chamfer4_edges, length=CHAMFER4_SIZE - 0.0001)  # a hair under: the kernel refuses the full size

    # Sketch59 → Boss-Extrude21 (add)
    with BuildSketch(Plane.XY.offset(24.2)):
        with Locations((3.1, 2.75)):
            Rectangle(SKETCH59_W, SKETCH59_H)
        with Locations((-3.1, 2.75)):
            Rectangle(SKETCH59_W, SKETCH59_H)
    extrude(amount=BOSS_EXTRUDE21_DEPTH)

    # Sketch61 → Boss-Extrude23 (add)
    with BuildSketch(Plane.XZ.offset(-3.8)):
        with BuildLine():
            Line((-7.790499921, 24.2), (-7.790499921, 24.8))
            Line((-7.790499921, 24.8), (-14.11637904, 24.8))
            Line((-14.11637904, 24.8), (-14.142428529, 24.8))
            ThreePointArc((-14.142428529, 24.8), (-14.389162258, 24.514360411), (-14.598076211, 24.2))
            Line((-14.598076211, 24.2), (-7.790499921, 24.2))
        make_face()
        with Locations((-5.645249961, 24.5)):
            Rectangle(SKETCH61_W, SKETCH61_H)
        Polygon((14.115997682, 24.8), (-3.5, 24.8), (-3.5, 24.2), (15.044287411, 24.2), (15.044287411, 24.8), align=None)
    extrude(amount=BOSS_EXTRUDE23_DEPTH)

    # Sketch64 → Cut-Extrude26 (cut)
    with BuildSketch(Plane.XZ):
        with Locations((-2.4, 24.5)):
            Rectangle(SKETCH64_W, SKETCH64_H)
        with Locations((2.4, 24.5)):
            Rectangle(SKETCH64_W, SKETCH64_H)
    extrude(amount=-CUT_EXTRUDE26_DEPTH, mode=Mode.SUBTRACT)

    # Sketch65 → Cut-Extrude27 (cut)
    with BuildSketch(Plane.XZ.offset(CUT_EXTRUDE27_START)):
        with BuildLine():
            Line((11.133212655, 26.5), (0, 26.5))
            Line((0, 26.5), (-12, 26.5))
            ThreePointArc((-12, 26.5), (-12.00193035, 26.499999379), (-12.0038607, 26.499997516))
            ThreePointArc((-12.0038607, 26.499997516), (-13.598505772, 26.038656987), (-14.703701167, 24.8))
            Line((-14.703701167, 24.8), (-14.142428529, 24.8))
            ThreePointArc((-14.142428529, 24.8), (-13.161895004, 25.465863337), (-12, 25.7))
            Line((-12, 25.7), (12, 25.7))
            ThreePointArc((12, 25.7), (13.161895004, 25.465863337), (14.142428529, 24.8))
            Line((14.142428529, 24.8), (14.703701167, 24.8))
            ThreePointArc((14.703701167, 24.8), (13.596871942, 26.03968502), (12, 26.5))
            Line((12, 26.5), (11.133212655, 26.5))
        make_face()
        with BuildLine():
            ThreePointArc((-12, 25.7), (-13.161895004, 25.465863337), (-14.142428529, 24.8))
            Line((-14.142428529, 24.8), (-4.8, 24.8))
            Line((-4.8, 24.8), (4.8, 24.8))
            Line((4.8, 24.8), (14.142428529, 24.8))
            ThreePointArc((14.142428529, 24.8), (13.161895004, 25.465863337), (12, 25.7))
            Line((12, 25.7), (-12, 25.7))
        make_face()
    extrude(amount=CUT_EXTRUDE27_DEPTH, mode=Mode.SUBTRACT)


solid = part.part
